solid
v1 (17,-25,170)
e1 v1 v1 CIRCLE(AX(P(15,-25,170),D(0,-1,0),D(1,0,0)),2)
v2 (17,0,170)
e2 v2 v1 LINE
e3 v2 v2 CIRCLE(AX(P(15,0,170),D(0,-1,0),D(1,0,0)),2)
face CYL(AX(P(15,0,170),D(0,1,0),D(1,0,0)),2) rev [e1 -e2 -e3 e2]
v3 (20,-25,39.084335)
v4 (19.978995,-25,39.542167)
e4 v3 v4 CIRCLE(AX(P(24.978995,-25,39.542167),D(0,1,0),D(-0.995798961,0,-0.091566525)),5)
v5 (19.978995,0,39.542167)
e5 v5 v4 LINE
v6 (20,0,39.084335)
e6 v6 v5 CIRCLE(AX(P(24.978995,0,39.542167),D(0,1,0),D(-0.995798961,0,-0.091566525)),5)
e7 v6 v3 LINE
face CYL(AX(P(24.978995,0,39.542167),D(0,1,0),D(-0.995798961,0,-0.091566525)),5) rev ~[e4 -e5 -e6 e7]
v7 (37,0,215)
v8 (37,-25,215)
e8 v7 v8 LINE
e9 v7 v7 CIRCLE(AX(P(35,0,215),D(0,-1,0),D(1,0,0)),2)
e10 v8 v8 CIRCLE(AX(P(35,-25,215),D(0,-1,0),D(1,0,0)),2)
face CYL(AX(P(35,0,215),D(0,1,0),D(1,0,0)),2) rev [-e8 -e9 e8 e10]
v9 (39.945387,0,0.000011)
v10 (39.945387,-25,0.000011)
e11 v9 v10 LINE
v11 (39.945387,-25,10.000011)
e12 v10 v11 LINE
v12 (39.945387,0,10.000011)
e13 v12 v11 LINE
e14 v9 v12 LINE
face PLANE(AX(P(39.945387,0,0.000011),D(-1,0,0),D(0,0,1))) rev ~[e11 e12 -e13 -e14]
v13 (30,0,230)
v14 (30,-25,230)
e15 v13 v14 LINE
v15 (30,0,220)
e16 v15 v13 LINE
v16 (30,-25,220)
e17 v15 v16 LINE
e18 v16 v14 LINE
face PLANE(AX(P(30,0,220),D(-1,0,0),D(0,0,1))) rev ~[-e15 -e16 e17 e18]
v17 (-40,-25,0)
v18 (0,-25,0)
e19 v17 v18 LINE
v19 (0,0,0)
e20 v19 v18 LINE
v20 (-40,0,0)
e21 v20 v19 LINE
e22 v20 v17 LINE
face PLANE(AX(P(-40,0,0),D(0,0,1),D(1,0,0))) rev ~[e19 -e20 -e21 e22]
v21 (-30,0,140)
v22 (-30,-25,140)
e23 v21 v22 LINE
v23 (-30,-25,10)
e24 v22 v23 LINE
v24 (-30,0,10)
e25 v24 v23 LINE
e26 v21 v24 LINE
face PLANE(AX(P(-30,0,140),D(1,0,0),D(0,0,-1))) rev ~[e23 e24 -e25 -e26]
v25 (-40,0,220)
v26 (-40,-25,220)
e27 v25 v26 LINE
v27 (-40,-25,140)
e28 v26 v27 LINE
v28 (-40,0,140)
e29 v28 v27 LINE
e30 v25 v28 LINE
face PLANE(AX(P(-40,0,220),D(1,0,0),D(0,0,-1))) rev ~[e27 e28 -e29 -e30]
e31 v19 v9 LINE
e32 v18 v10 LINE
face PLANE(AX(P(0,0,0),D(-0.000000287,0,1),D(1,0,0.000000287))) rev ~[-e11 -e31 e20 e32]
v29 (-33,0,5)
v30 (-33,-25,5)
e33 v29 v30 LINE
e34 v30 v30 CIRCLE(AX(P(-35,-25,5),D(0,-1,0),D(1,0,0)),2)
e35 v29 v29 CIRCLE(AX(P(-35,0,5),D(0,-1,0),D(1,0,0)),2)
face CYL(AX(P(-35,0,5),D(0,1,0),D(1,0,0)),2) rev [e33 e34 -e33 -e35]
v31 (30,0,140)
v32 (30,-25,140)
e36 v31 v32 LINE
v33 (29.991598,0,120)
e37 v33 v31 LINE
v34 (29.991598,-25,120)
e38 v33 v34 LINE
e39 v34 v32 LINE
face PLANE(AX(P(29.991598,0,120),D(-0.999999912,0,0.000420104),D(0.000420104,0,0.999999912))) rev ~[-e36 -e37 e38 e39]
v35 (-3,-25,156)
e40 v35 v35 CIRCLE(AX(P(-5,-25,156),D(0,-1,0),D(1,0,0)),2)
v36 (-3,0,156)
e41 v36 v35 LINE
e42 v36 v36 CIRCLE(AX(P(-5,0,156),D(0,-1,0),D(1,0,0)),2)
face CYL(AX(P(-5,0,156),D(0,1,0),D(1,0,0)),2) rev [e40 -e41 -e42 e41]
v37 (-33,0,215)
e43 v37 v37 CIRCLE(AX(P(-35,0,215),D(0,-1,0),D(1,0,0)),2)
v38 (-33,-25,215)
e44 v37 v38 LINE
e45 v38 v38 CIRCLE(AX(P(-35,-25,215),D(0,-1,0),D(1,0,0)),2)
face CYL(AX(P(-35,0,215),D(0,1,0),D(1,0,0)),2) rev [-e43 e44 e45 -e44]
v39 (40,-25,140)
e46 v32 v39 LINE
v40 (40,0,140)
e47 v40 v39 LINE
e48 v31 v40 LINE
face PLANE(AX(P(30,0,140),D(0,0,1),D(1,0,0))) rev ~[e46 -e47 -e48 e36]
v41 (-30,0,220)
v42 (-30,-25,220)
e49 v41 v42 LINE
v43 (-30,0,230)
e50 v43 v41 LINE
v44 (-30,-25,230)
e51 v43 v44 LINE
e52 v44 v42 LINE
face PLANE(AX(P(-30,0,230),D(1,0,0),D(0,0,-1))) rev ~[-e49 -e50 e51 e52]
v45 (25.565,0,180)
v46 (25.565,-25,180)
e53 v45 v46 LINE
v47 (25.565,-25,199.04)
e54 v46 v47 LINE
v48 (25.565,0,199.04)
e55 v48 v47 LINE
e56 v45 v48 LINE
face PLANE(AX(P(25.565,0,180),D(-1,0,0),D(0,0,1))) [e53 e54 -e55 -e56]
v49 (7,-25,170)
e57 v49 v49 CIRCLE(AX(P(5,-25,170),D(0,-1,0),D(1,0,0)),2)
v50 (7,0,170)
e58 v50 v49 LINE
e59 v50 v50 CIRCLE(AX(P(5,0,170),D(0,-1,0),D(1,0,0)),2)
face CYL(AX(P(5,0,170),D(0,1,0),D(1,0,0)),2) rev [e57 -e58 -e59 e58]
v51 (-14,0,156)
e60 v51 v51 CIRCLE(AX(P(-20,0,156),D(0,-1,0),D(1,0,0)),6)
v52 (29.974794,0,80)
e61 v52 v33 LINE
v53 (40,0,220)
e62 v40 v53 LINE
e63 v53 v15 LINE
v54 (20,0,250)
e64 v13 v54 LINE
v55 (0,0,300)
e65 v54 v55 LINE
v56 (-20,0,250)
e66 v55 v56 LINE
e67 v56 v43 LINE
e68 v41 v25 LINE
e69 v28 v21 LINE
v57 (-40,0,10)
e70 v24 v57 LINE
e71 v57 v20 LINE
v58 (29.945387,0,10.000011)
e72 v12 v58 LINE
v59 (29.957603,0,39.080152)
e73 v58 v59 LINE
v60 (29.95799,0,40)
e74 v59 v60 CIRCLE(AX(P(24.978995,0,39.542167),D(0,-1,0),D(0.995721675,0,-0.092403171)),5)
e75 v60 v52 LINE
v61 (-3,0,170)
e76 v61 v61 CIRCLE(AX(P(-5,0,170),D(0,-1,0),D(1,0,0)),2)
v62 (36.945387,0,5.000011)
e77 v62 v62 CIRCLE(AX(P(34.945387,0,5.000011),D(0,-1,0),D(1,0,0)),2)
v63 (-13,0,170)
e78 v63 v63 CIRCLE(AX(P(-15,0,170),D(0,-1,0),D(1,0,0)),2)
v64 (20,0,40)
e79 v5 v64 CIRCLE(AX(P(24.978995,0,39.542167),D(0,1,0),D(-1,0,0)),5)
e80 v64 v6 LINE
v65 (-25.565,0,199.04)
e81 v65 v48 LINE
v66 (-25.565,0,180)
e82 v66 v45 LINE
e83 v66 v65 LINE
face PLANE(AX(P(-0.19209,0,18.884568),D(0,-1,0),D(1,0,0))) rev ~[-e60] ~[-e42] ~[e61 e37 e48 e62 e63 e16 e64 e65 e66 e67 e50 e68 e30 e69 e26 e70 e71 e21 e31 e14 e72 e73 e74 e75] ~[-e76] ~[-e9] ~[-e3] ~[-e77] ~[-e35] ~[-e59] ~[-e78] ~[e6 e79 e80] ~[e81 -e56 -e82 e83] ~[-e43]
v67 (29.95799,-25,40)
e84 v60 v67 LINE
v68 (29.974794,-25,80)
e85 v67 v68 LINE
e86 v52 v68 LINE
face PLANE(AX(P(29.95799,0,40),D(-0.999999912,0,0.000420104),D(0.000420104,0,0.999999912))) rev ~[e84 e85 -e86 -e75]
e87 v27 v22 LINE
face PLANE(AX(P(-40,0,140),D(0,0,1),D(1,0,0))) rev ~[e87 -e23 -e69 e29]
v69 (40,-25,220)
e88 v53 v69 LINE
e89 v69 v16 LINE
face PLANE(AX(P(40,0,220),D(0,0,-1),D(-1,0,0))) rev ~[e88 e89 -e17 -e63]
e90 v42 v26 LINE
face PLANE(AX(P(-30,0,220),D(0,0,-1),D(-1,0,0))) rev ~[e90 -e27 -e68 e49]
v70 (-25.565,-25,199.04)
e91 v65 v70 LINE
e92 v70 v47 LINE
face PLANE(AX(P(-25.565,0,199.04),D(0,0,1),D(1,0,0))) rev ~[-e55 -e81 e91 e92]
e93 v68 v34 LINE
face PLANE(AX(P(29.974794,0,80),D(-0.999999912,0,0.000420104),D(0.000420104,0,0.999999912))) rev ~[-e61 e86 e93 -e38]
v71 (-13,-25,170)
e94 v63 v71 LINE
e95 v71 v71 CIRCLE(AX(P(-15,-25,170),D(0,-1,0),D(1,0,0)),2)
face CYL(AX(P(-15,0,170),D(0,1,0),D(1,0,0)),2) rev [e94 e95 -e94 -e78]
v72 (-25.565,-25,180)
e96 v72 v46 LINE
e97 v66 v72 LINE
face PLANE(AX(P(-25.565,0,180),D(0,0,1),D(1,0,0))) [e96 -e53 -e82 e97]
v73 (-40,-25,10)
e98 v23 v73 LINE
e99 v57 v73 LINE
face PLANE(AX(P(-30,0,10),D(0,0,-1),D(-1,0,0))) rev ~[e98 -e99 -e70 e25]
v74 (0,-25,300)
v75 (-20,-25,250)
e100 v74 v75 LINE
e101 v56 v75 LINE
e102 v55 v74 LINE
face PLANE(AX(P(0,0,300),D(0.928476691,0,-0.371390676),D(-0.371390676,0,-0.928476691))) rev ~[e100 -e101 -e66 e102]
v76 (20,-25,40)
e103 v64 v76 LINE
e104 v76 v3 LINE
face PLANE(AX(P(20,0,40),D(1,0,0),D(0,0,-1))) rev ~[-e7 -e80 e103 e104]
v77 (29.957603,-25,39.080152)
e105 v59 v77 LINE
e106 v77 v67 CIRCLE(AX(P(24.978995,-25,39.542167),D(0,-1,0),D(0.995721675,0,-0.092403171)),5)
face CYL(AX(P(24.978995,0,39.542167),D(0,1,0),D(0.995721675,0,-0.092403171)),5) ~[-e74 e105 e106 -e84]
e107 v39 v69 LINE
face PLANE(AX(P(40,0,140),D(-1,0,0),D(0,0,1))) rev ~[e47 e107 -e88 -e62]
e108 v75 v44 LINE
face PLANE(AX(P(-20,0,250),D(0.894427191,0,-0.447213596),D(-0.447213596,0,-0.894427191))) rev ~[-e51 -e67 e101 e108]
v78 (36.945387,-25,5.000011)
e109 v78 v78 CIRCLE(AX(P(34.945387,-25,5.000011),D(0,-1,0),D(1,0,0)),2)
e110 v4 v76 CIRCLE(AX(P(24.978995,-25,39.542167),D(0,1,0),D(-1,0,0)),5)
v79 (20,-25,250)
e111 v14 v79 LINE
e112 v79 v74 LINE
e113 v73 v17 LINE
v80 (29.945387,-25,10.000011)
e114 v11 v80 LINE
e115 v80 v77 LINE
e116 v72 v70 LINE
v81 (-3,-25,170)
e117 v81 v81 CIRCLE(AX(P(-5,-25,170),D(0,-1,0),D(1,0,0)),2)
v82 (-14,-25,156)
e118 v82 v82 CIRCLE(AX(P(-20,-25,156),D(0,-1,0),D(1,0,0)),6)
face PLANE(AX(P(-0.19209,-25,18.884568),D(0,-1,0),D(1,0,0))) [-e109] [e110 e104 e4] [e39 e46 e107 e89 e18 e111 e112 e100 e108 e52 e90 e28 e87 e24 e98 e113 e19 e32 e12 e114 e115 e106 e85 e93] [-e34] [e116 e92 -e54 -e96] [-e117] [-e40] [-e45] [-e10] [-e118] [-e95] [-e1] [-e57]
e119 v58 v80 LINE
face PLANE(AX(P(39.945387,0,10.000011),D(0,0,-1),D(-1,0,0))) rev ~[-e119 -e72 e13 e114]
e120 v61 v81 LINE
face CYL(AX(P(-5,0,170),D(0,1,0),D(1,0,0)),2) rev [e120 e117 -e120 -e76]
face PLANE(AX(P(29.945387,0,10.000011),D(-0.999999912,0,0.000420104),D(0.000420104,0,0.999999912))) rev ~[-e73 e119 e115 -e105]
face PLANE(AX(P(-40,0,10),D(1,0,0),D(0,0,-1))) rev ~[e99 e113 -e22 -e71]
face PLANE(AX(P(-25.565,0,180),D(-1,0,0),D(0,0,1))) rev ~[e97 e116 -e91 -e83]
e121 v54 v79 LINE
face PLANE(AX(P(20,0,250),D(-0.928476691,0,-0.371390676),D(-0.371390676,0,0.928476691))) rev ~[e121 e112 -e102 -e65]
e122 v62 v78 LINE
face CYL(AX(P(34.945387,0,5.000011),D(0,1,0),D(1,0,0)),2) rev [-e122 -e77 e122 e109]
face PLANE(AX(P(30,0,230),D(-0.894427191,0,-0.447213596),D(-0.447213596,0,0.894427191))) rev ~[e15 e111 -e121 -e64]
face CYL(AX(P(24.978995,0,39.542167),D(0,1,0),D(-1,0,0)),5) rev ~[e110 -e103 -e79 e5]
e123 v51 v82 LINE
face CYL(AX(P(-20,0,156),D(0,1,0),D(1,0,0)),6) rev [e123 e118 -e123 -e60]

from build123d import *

# Parameters (mm, degrees)
F0_R     = 2
F0_R_2   = 6
F0_W     = 51.13
F0_H     = 19.04
F1_DEPTH = 25


# Not quite as in the source:
# - ends of sketch curves that miss each other by under 0.0002 mm in the source are joined


with BuildPart() as f1:
    # F0 (on Front) → F1 (new body)
    with BuildSketch(Plane.XZ):
        with BuildLine():
            Line((-0.0546134975, 0), (0, 0))
            Line((0, 0), (39.9453865025, 1.14717e-05))
            Line((39.9453865025, 1.14717e-05), (39.9453865025, 10.0000114717))
            Line((39.9453865025, 10.0000114717), (29.9453865025, 10.0000114717))
            Line((29.9453865025, 10.0000114717), (29.9576031817, 39.0801515195))
            ThreePointArc((29.9576031817, 39.0801515195), (24.9768942877, 34.5421678148), (20, 39.0843347471))
            ThreePointArc((20, 39.0843347471), (19.9842488656, 39.3130102593), (19.9789948068, 39.5421673735))
            ThreePointArc((19.9789948068, 39.5421673735), (14.7708428858, 35.0052540588), (10, 40))
            ThreePointArc((10, 40), (5, 35), (0, 40))
            ThreePointArc((0, 40), (-5, 35), (-10, 40))
            ThreePointArc((-10, 40), (-15, 35), (-20, 40))
            ThreePointArc((-20, 40), (-25, 35), (-30, 40))
            Line((-30, 40), (-30, 10))
            Line((-30, 10), (-40, 10))
            Line((-40, 10), (-40, 0))
            Line((-40, 0), (-0.0546134975, 0))
        make_face()
        with Locations((-35, 5)):
            Circle(F0_R, mode=Mode.SUBTRACT)
        with Locations((34.9453865025, 5.0000114717)):
            Circle(F0_R, mode=Mode.SUBTRACT)
        with BuildLine():
            ThreePointArc((20, 39.0843347471), (24.9768942877, 34.5421678148), (29.9576031817, 39.0801515195))
            Line((29.9576031817, 39.0801515195), (29.9579896136, 40))
            Line((29.9579896136, 40), (29.9747937682, 80))
            ThreePointArc((29.9747937682, 80), (24.9873968841, 75.3547848935), (20, 80))
            Line((20, 80), (20, 40))
            Line((20, 40), (20, 39.0843347471))
        make_face()
        with BuildLine():
            Line((29.9579896136, 40), (29.9576031817, 39.0801515195))
            ThreePointArc((29.9576031817, 39.0801515195), (29.9789943656, 39.5400668544), (29.9579896136, 40))
        make_face()
        with BuildLine():
            Line((-30, 80), (-30, 40))
            ThreePointArc((-30, 40), (-25, 35), (-20, 40))
            Line((-20, 40), (-20, 80))
            ThreePointArc((-20, 80), (-25, 75), (-30, 80))
        make_face()
        with BuildLine():
            Line((-30, 120), (-30, 80))
            ThreePointArc((-30, 80), (-25, 75), (-20, 80))
            Line((-20, 80), (-20, 120))
            ThreePointArc((-20, 120), (-25, 115), (-30, 120))
        make_face()
        with BuildLine():
            ThreePointArc((20, 80), (24.9873968841, 75.3547848935), (29.9747937682, 80))
            Line((29.9747937682, 80), (29.9915979227, 120))
            ThreePointArc((29.9915979227, 120), (24.9957989614, 115.2049212963), (20, 120))
            Line((20, 120), (20, 80))
        make_face()
        with BuildLine():
            Line((-30, 140), (-30, 120))
            ThreePointArc((-30, 120), (-25, 115), (-20, 120))
            Line((-20, 120), (-20, 140))
            Line((-20, 140), (-30, 140))
        make_face()
        with BuildLine():
            ThreePointArc((20, 120), (24.9957989614, 115.2049212963), (29.9915979227, 120))
            Line((29.9915979227, 120), (30, 140))
            Line((30, 140), (20, 140))
            Line((20, 140), (20, 120))
        make_face()
        Polygon((-40, 140), (-30, 140), (-20, 140), (-10, 140), (0, 140), (10, 140), (20, 140), (30, 140), (40, 140), (40, 220), (30, 220), (-30, 220), (-40, 220), align=None)
        with Locations((-35, 215)):
            Circle(F0_R, mode=Mode.SUBTRACT)
        with Locations((-20, 156)):
            Circle(F0_R_2, mode=Mode.SUBTRACT)
        with Locations((-15, 170)):
            Circle(F0_R, mode=Mode.SUBTRACT)
        with Locations((-5, 156)):
            Circle(F0_R, mode=Mode.SUBTRACT)
        with Locations((-5, 170)):
            Circle(F0_R, mode=Mode.SUBTRACT)
        with Locations((5, 170)):
            Circle(F0_R, mode=Mode.SUBTRACT)
        with Locations((15, 170)):
            Circle(F0_R, mode=Mode.SUBTRACT)
        with Locations((0, 189.52)):
            Rectangle(F0_W, F0_H, mode=Mode.SUBTRACT)
        with Locations((35, 215)):
            Circle(F0_R, mode=Mode.SUBTRACT)
        Polygon((-30, 230), (-30, 220), (30, 220), (30, 230), (0, 230), align=None)
        Polygon((-20, 250), (-30, 230), (0, 230), (30, 230), (20, 250), (0, 250), align=None)
        Polygon((0, 300), (-20, 250), (0, 250), (20, 250), align=None)
        with BuildLine():
            Line((-20, 120), (-20, 80))
            ThreePointArc((-20, 80), (-15, 75), (-10, 80))
            Line((-10, 80), (-10, 120))
            ThreePointArc((-10, 120), (-15, 115), (-20, 120))
        make_face()
        with BuildLine():
            Line((-10, 120), (-10, 80))
            ThreePointArc((-10, 80), (-5, 75), (0, 80))
            Line((0, 80), (0, 120))
            ThreePointArc((0, 120), (-5, 115), (-10, 120))
        make_face()
        with BuildLine():
            ThreePointArc((0, 80), (5, 75), (10, 80))
            Line((10, 80), (10, 120))
            ThreePointArc((10, 120), (5, 115), (0, 120))
            Line((0, 120), (0, 80))
        make_face()
        with BuildLine():
            ThreePointArc((10, 80), (15, 75), (20, 80))
            Line((20, 80), (20, 120))
            ThreePointArc((20, 120), (15, 115), (10, 120))
            Line((10, 120), (10, 80))
        make_face()
        with BuildLine():
            ThreePointArc((19.9789948068, 39.5421673735), (19.9842488656, 39.7713244878), (20, 40))
            Line((20, 40), (20, 80))
            ThreePointArc((20, 80), (15, 75), (10, 80))
            Line((10, 80), (10, 40))
            ThreePointArc((10, 40), (14.7708428858, 35.0052540588), (19.9789948068, 39.5421673735))
        make_face()
        with BuildLine():
            ThreePointArc((0, 40), (5, 35), (10, 40))
            Line((10, 40), (10, 80))
            ThreePointArc((10, 80), (5, 75), (0, 80))
            Line((0, 80), (0, 40))
        make_face()
        with BuildLine():
            Line((-10, 80), (-10, 40))
            ThreePointArc((-10, 40), (-5, 35), (0, 40))
            Line((0, 40), (0, 80))
            ThreePointArc((0, 80), (-5, 75), (-10, 80))
        make_face()
        with BuildLine():
            Line((-20, 80), (-20, 40))
            ThreePointArc((-20, 40), (-15, 35), (-10, 40))
            Line((-10, 40), (-10, 80))
            ThreePointArc((-10, 80), (-15, 75), (-20, 80))
        make_face()
        with BuildLine():
            Line((-20, 140), (-20, 120))
            ThreePointArc((-20, 120), (-15, 115), (-10, 120))
            Line((-10, 120), (-10, 140))
            Line((-10, 140), (-20, 140))
        make_face()
        with BuildLine():
            Line((-10, 140), (-10, 120))
            ThreePointArc((-10, 120), (-5, 115), (0, 120))
            Line((0, 120), (0, 140))
            Line((0, 140), (-10, 140))
        make_face()
        with BuildLine():
            ThreePointArc((0, 120), (5, 115), (10, 120))
            Line((10, 120), (10, 140))
            Line((10, 140), (0, 140))
            Line((0, 140), (0, 120))
        make_face()
        with BuildLine():
            ThreePointArc((10, 120), (15, 115), (20, 120))
            Line((20, 120), (20, 140))
            Line((20, 140), (10, 140))
            Line((10, 140), (10, 120))
        make_face()
    extrude(amount=F1_DEPTH)


solid = f1.part
